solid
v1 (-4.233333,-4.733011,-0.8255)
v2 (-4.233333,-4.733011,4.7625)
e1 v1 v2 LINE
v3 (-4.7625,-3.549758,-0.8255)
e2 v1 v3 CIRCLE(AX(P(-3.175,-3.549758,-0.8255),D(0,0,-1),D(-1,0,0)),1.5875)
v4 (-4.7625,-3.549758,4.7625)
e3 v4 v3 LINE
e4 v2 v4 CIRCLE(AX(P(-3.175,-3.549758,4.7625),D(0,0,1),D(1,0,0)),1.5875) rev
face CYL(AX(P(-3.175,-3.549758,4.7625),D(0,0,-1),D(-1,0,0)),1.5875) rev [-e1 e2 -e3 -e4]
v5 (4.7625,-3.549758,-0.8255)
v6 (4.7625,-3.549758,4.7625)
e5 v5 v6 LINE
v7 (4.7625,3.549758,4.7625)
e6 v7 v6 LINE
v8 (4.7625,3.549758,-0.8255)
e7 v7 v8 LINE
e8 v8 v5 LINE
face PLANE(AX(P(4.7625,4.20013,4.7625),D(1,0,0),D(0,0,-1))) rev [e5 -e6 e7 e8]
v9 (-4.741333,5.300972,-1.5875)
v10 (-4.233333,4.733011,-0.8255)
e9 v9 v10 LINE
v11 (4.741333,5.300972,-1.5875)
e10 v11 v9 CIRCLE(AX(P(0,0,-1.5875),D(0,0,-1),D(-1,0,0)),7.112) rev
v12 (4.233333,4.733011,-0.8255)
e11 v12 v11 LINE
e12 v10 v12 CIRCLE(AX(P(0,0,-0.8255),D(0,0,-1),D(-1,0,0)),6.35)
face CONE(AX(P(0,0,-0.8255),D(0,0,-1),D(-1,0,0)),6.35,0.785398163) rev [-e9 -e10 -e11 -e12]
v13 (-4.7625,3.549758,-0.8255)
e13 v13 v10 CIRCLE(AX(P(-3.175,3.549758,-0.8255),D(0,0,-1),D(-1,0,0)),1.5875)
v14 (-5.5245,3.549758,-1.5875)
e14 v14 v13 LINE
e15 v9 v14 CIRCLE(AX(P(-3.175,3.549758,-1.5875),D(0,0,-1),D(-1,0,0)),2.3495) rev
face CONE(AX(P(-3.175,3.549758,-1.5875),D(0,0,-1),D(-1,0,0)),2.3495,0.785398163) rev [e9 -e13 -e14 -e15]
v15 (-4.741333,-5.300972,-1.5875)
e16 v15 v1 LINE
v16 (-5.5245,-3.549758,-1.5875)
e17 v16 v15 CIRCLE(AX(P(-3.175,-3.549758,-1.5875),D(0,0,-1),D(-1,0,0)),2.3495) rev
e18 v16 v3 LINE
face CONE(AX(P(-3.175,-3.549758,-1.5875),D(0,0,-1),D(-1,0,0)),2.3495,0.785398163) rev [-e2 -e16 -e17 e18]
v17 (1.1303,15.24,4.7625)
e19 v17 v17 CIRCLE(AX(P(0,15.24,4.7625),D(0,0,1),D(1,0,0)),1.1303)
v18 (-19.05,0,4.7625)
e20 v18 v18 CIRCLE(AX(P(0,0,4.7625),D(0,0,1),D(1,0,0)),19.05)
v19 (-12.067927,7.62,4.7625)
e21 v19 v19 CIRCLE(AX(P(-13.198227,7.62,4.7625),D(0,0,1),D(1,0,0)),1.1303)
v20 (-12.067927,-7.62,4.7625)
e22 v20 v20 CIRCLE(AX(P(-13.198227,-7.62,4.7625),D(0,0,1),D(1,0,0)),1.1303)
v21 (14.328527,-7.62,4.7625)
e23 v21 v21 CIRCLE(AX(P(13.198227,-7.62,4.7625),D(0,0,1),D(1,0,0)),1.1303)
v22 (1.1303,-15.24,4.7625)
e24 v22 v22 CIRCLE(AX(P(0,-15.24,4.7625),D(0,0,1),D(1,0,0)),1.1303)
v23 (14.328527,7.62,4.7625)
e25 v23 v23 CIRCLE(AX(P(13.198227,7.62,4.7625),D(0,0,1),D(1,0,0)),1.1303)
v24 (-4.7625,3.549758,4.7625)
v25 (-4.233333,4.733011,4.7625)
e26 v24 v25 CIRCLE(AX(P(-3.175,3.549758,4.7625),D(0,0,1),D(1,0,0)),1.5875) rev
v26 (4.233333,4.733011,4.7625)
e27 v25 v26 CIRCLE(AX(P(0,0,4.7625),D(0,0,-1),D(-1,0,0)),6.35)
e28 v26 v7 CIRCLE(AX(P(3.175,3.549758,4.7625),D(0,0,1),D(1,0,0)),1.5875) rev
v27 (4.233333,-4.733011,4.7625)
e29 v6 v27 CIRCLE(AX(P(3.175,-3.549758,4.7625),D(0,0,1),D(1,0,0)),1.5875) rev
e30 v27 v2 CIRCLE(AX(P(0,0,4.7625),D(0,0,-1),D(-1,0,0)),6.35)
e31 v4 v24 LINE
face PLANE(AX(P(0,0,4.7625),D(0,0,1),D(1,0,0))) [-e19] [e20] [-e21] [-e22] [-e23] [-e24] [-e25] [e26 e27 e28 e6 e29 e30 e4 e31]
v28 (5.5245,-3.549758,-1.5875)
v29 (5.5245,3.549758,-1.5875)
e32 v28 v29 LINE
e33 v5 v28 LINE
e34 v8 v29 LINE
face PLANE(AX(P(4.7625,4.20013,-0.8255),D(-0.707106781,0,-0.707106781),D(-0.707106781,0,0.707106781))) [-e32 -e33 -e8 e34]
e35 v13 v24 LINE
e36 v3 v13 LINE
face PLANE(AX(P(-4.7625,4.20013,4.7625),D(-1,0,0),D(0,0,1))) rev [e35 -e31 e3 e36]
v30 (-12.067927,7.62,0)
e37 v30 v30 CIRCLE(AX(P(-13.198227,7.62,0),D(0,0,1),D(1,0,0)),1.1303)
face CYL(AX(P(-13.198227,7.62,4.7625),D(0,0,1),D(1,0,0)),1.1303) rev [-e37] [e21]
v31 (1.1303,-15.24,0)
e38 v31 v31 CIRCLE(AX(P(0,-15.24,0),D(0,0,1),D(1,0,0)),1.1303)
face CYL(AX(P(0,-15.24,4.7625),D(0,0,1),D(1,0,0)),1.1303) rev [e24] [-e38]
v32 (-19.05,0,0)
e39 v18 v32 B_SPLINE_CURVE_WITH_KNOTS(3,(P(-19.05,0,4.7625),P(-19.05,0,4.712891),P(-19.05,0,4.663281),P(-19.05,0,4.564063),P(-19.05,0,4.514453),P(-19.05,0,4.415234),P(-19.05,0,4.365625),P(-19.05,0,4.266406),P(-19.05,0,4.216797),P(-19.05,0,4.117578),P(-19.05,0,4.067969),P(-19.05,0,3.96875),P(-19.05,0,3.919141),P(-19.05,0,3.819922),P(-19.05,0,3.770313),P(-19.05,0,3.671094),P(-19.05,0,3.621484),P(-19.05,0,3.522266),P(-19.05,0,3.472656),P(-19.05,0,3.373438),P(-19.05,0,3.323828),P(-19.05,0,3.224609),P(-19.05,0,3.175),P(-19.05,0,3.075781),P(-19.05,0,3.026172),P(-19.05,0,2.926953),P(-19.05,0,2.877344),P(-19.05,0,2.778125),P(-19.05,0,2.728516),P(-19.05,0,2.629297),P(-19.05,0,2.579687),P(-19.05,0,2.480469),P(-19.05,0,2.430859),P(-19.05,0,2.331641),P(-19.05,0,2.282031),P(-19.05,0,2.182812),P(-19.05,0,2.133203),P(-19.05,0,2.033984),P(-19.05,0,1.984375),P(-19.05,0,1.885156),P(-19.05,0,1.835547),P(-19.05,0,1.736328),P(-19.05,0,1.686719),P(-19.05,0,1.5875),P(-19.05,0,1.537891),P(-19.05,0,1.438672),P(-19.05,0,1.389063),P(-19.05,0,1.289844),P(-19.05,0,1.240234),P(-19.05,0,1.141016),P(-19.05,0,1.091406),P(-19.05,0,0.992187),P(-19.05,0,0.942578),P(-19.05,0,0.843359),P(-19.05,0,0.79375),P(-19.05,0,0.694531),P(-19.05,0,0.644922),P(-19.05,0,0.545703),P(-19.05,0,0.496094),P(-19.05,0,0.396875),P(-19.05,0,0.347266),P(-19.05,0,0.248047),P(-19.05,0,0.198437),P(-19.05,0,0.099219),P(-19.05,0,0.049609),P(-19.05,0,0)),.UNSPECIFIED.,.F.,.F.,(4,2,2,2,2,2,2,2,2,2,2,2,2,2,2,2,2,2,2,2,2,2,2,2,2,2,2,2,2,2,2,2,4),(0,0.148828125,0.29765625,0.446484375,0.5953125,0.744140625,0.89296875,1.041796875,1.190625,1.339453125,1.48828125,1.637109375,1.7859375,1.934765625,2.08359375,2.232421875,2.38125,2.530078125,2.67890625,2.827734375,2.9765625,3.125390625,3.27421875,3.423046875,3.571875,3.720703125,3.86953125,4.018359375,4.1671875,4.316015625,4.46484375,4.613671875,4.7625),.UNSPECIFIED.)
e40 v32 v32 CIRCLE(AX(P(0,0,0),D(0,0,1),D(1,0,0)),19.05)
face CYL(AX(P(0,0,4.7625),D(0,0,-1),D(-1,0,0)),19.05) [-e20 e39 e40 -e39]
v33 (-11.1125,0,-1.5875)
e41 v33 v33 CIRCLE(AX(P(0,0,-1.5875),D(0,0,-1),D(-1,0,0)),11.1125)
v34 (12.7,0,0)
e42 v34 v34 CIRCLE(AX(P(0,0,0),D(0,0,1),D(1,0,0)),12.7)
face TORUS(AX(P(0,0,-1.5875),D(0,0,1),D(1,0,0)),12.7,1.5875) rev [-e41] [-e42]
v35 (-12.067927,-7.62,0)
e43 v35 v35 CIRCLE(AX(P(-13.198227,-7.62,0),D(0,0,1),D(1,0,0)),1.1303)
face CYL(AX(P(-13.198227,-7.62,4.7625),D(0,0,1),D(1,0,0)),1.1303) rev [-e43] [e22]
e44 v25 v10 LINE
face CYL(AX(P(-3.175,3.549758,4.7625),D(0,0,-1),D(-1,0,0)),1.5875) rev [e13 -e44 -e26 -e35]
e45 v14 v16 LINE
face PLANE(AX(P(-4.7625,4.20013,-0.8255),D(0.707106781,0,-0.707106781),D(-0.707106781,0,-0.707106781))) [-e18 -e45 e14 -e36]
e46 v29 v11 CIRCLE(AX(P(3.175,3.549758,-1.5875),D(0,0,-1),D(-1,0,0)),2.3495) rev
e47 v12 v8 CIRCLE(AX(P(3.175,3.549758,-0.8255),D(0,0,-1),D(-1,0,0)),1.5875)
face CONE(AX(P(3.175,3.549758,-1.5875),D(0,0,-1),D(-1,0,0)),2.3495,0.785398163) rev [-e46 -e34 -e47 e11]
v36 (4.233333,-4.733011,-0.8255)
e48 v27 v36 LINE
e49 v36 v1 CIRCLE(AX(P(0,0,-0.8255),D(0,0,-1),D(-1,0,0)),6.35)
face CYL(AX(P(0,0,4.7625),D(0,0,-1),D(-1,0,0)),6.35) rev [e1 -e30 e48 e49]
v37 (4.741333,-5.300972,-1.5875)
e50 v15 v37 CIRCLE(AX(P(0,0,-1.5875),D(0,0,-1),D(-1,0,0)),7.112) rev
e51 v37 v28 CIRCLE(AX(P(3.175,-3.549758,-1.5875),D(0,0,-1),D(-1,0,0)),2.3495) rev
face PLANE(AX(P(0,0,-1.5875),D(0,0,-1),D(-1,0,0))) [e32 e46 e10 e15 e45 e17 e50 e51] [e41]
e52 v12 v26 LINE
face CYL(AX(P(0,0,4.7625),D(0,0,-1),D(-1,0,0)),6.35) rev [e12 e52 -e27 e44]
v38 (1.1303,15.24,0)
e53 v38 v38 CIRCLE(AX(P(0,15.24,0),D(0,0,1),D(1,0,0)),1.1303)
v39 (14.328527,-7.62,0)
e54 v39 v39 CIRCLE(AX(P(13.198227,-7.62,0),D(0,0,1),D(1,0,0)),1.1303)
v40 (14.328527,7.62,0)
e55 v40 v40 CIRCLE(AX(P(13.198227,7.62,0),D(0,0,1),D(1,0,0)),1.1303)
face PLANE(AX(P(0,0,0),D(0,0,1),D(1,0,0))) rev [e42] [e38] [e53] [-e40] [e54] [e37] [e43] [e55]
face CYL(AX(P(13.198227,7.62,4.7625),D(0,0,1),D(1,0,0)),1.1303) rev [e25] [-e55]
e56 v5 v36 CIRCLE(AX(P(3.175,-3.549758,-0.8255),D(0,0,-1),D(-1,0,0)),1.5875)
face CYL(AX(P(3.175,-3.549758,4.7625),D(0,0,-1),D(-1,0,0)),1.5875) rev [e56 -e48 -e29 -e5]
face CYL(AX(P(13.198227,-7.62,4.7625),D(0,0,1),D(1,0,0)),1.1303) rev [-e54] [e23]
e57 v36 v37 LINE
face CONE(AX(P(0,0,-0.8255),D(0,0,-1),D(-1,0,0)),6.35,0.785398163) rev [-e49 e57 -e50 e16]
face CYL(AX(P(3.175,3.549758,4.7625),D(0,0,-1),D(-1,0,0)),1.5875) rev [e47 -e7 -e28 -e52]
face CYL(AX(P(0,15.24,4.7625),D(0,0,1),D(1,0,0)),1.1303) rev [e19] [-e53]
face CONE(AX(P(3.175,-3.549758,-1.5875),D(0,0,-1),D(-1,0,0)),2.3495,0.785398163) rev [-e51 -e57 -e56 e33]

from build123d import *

# Parameters (mm, degrees)
SKETCH1_R             = 19.05
BOSS_EXTRUDE1_DEPTH   = 4.7625
SKETCH2_R             = 11.1125
BOSS_EXTRUDE2_DEPTH   = 1.5875
FILLET1_R             = 1.5875
CUT_EXTRUDE1_DEPTH    = 28.679008291
FILLET2_R             = 1.5875
F_4_40_TAPPED_HOLE1_D = 2.2606
CIRPATTERN1_COUNT     = 6
CHAMFER1_SIZE         = 0.762


with BuildPart() as part:
    # Sketch1 → Boss-Extrude1 (new body)
    with BuildSketch(Plane.XY):
        with Locations(Location((0, 0, 0), (0, 0, 180))):
            Circle(SKETCH1_R)
    extrude(amount=BOSS_EXTRUDE1_DEPTH)

    # Sketch2 → Boss-Extrude2 (add)
    with BuildSketch(Plane(origin=(0, 0, 0), x_dir=(-1, 0, 0), z_dir=(0, 0, -1))):
        with Locations(Location((0, 0, 0), (0, 0, 180))):
            Circle(SKETCH2_R)
    extrude(amount=BOSS_EXTRUDE2_DEPTH)

    # Fillet1
    fillet1_edges = [part.edges().sort_by_distance(p)[0] for p in [
        (-11.1125, 0, 0),
    ]]
    fillet(fillet1_edges, radius=FILLET1_R - 0.0001)  # a hair under: the kernel refuses the full size

    # Sketch3 → Cut-Extrude1 (cut, through all)
    with BuildSketch(Plane(origin=(0, 0, -1.5875), x_dir=(-1, 0, 0), z_dir=(0, 0, -1))):
        with BuildLine():
            Line((-4.7625, 4.200130206), (-4.7625, -4.200130206))
            ThreePointArc((-4.7625, -4.200130206), (0, -6.35), (4.7625, -4.200130206))
            Line((4.7625, -4.200130206), (4.7625, 4.200130206))
            ThreePointArc((4.7625, 4.200130206), (0, 6.35), (-4.7625, 4.200130206))
        make_face()
    extrude(amount=-CUT_EXTRUDE1_DEPTH, mode=Mode.SUBTRACT)

    # Fillet2
    fillet2_edges = [part.edges().sort_by_distance(p)[0] for p in [
        (4.7625, 4.200130206, 1.5875),
        (-4.7625, 4.200130206, 1.5875),
        (-4.7625, -4.200130206, 1.5875),
        (4.7625, -4.200130206, 1.5875),
    ]]
    fillet(fillet2_edges, radius=FILLET2_R)

    # #4-40 Tapped Hole1 (through all)
    with Locations(Plane.XY.offset(4.7625)):
        with Locations((0, 15.24)):
            f_4_40_tapped_hole1 = Hole(F_4_40_TAPPED_HOLE1_D / 2)

    # CirPattern1: #4-40 Tapped Hole1 ×6 about axis
    cirpattern1_axis = Axis((0, 0, 0), (0, 0, 1))
    for i in range(1, CIRPATTERN1_COUNT):
        add(f_4_40_tapped_hole1.rotate(cirpattern1_axis, i * 360 / CIRPATTERN1_COUNT), mode=Mode.SUBTRACT)

    # Chamfer1
    chamfer1_edges = [part.edges().sort_by_distance(p)[0] for p in [
        (-4.7625, 0, -1.5875),
        (0, -6.35, -1.5875),
        (4.7625, 0, -1.5875),
        (0, 6.35, -1.5875),
        (-4.6241826, -4.197852075, -1.5875),
        (4.6241826, -4.197852075, -1.5875),
        (-4.6241826, 4.197852075, -1.5875),
        (4.6241826, 4.197852075, -1.5875),
    ]]
    chamfer(chamfer1_edges, length=CHAMFER1_SIZE)


solid = part.part
